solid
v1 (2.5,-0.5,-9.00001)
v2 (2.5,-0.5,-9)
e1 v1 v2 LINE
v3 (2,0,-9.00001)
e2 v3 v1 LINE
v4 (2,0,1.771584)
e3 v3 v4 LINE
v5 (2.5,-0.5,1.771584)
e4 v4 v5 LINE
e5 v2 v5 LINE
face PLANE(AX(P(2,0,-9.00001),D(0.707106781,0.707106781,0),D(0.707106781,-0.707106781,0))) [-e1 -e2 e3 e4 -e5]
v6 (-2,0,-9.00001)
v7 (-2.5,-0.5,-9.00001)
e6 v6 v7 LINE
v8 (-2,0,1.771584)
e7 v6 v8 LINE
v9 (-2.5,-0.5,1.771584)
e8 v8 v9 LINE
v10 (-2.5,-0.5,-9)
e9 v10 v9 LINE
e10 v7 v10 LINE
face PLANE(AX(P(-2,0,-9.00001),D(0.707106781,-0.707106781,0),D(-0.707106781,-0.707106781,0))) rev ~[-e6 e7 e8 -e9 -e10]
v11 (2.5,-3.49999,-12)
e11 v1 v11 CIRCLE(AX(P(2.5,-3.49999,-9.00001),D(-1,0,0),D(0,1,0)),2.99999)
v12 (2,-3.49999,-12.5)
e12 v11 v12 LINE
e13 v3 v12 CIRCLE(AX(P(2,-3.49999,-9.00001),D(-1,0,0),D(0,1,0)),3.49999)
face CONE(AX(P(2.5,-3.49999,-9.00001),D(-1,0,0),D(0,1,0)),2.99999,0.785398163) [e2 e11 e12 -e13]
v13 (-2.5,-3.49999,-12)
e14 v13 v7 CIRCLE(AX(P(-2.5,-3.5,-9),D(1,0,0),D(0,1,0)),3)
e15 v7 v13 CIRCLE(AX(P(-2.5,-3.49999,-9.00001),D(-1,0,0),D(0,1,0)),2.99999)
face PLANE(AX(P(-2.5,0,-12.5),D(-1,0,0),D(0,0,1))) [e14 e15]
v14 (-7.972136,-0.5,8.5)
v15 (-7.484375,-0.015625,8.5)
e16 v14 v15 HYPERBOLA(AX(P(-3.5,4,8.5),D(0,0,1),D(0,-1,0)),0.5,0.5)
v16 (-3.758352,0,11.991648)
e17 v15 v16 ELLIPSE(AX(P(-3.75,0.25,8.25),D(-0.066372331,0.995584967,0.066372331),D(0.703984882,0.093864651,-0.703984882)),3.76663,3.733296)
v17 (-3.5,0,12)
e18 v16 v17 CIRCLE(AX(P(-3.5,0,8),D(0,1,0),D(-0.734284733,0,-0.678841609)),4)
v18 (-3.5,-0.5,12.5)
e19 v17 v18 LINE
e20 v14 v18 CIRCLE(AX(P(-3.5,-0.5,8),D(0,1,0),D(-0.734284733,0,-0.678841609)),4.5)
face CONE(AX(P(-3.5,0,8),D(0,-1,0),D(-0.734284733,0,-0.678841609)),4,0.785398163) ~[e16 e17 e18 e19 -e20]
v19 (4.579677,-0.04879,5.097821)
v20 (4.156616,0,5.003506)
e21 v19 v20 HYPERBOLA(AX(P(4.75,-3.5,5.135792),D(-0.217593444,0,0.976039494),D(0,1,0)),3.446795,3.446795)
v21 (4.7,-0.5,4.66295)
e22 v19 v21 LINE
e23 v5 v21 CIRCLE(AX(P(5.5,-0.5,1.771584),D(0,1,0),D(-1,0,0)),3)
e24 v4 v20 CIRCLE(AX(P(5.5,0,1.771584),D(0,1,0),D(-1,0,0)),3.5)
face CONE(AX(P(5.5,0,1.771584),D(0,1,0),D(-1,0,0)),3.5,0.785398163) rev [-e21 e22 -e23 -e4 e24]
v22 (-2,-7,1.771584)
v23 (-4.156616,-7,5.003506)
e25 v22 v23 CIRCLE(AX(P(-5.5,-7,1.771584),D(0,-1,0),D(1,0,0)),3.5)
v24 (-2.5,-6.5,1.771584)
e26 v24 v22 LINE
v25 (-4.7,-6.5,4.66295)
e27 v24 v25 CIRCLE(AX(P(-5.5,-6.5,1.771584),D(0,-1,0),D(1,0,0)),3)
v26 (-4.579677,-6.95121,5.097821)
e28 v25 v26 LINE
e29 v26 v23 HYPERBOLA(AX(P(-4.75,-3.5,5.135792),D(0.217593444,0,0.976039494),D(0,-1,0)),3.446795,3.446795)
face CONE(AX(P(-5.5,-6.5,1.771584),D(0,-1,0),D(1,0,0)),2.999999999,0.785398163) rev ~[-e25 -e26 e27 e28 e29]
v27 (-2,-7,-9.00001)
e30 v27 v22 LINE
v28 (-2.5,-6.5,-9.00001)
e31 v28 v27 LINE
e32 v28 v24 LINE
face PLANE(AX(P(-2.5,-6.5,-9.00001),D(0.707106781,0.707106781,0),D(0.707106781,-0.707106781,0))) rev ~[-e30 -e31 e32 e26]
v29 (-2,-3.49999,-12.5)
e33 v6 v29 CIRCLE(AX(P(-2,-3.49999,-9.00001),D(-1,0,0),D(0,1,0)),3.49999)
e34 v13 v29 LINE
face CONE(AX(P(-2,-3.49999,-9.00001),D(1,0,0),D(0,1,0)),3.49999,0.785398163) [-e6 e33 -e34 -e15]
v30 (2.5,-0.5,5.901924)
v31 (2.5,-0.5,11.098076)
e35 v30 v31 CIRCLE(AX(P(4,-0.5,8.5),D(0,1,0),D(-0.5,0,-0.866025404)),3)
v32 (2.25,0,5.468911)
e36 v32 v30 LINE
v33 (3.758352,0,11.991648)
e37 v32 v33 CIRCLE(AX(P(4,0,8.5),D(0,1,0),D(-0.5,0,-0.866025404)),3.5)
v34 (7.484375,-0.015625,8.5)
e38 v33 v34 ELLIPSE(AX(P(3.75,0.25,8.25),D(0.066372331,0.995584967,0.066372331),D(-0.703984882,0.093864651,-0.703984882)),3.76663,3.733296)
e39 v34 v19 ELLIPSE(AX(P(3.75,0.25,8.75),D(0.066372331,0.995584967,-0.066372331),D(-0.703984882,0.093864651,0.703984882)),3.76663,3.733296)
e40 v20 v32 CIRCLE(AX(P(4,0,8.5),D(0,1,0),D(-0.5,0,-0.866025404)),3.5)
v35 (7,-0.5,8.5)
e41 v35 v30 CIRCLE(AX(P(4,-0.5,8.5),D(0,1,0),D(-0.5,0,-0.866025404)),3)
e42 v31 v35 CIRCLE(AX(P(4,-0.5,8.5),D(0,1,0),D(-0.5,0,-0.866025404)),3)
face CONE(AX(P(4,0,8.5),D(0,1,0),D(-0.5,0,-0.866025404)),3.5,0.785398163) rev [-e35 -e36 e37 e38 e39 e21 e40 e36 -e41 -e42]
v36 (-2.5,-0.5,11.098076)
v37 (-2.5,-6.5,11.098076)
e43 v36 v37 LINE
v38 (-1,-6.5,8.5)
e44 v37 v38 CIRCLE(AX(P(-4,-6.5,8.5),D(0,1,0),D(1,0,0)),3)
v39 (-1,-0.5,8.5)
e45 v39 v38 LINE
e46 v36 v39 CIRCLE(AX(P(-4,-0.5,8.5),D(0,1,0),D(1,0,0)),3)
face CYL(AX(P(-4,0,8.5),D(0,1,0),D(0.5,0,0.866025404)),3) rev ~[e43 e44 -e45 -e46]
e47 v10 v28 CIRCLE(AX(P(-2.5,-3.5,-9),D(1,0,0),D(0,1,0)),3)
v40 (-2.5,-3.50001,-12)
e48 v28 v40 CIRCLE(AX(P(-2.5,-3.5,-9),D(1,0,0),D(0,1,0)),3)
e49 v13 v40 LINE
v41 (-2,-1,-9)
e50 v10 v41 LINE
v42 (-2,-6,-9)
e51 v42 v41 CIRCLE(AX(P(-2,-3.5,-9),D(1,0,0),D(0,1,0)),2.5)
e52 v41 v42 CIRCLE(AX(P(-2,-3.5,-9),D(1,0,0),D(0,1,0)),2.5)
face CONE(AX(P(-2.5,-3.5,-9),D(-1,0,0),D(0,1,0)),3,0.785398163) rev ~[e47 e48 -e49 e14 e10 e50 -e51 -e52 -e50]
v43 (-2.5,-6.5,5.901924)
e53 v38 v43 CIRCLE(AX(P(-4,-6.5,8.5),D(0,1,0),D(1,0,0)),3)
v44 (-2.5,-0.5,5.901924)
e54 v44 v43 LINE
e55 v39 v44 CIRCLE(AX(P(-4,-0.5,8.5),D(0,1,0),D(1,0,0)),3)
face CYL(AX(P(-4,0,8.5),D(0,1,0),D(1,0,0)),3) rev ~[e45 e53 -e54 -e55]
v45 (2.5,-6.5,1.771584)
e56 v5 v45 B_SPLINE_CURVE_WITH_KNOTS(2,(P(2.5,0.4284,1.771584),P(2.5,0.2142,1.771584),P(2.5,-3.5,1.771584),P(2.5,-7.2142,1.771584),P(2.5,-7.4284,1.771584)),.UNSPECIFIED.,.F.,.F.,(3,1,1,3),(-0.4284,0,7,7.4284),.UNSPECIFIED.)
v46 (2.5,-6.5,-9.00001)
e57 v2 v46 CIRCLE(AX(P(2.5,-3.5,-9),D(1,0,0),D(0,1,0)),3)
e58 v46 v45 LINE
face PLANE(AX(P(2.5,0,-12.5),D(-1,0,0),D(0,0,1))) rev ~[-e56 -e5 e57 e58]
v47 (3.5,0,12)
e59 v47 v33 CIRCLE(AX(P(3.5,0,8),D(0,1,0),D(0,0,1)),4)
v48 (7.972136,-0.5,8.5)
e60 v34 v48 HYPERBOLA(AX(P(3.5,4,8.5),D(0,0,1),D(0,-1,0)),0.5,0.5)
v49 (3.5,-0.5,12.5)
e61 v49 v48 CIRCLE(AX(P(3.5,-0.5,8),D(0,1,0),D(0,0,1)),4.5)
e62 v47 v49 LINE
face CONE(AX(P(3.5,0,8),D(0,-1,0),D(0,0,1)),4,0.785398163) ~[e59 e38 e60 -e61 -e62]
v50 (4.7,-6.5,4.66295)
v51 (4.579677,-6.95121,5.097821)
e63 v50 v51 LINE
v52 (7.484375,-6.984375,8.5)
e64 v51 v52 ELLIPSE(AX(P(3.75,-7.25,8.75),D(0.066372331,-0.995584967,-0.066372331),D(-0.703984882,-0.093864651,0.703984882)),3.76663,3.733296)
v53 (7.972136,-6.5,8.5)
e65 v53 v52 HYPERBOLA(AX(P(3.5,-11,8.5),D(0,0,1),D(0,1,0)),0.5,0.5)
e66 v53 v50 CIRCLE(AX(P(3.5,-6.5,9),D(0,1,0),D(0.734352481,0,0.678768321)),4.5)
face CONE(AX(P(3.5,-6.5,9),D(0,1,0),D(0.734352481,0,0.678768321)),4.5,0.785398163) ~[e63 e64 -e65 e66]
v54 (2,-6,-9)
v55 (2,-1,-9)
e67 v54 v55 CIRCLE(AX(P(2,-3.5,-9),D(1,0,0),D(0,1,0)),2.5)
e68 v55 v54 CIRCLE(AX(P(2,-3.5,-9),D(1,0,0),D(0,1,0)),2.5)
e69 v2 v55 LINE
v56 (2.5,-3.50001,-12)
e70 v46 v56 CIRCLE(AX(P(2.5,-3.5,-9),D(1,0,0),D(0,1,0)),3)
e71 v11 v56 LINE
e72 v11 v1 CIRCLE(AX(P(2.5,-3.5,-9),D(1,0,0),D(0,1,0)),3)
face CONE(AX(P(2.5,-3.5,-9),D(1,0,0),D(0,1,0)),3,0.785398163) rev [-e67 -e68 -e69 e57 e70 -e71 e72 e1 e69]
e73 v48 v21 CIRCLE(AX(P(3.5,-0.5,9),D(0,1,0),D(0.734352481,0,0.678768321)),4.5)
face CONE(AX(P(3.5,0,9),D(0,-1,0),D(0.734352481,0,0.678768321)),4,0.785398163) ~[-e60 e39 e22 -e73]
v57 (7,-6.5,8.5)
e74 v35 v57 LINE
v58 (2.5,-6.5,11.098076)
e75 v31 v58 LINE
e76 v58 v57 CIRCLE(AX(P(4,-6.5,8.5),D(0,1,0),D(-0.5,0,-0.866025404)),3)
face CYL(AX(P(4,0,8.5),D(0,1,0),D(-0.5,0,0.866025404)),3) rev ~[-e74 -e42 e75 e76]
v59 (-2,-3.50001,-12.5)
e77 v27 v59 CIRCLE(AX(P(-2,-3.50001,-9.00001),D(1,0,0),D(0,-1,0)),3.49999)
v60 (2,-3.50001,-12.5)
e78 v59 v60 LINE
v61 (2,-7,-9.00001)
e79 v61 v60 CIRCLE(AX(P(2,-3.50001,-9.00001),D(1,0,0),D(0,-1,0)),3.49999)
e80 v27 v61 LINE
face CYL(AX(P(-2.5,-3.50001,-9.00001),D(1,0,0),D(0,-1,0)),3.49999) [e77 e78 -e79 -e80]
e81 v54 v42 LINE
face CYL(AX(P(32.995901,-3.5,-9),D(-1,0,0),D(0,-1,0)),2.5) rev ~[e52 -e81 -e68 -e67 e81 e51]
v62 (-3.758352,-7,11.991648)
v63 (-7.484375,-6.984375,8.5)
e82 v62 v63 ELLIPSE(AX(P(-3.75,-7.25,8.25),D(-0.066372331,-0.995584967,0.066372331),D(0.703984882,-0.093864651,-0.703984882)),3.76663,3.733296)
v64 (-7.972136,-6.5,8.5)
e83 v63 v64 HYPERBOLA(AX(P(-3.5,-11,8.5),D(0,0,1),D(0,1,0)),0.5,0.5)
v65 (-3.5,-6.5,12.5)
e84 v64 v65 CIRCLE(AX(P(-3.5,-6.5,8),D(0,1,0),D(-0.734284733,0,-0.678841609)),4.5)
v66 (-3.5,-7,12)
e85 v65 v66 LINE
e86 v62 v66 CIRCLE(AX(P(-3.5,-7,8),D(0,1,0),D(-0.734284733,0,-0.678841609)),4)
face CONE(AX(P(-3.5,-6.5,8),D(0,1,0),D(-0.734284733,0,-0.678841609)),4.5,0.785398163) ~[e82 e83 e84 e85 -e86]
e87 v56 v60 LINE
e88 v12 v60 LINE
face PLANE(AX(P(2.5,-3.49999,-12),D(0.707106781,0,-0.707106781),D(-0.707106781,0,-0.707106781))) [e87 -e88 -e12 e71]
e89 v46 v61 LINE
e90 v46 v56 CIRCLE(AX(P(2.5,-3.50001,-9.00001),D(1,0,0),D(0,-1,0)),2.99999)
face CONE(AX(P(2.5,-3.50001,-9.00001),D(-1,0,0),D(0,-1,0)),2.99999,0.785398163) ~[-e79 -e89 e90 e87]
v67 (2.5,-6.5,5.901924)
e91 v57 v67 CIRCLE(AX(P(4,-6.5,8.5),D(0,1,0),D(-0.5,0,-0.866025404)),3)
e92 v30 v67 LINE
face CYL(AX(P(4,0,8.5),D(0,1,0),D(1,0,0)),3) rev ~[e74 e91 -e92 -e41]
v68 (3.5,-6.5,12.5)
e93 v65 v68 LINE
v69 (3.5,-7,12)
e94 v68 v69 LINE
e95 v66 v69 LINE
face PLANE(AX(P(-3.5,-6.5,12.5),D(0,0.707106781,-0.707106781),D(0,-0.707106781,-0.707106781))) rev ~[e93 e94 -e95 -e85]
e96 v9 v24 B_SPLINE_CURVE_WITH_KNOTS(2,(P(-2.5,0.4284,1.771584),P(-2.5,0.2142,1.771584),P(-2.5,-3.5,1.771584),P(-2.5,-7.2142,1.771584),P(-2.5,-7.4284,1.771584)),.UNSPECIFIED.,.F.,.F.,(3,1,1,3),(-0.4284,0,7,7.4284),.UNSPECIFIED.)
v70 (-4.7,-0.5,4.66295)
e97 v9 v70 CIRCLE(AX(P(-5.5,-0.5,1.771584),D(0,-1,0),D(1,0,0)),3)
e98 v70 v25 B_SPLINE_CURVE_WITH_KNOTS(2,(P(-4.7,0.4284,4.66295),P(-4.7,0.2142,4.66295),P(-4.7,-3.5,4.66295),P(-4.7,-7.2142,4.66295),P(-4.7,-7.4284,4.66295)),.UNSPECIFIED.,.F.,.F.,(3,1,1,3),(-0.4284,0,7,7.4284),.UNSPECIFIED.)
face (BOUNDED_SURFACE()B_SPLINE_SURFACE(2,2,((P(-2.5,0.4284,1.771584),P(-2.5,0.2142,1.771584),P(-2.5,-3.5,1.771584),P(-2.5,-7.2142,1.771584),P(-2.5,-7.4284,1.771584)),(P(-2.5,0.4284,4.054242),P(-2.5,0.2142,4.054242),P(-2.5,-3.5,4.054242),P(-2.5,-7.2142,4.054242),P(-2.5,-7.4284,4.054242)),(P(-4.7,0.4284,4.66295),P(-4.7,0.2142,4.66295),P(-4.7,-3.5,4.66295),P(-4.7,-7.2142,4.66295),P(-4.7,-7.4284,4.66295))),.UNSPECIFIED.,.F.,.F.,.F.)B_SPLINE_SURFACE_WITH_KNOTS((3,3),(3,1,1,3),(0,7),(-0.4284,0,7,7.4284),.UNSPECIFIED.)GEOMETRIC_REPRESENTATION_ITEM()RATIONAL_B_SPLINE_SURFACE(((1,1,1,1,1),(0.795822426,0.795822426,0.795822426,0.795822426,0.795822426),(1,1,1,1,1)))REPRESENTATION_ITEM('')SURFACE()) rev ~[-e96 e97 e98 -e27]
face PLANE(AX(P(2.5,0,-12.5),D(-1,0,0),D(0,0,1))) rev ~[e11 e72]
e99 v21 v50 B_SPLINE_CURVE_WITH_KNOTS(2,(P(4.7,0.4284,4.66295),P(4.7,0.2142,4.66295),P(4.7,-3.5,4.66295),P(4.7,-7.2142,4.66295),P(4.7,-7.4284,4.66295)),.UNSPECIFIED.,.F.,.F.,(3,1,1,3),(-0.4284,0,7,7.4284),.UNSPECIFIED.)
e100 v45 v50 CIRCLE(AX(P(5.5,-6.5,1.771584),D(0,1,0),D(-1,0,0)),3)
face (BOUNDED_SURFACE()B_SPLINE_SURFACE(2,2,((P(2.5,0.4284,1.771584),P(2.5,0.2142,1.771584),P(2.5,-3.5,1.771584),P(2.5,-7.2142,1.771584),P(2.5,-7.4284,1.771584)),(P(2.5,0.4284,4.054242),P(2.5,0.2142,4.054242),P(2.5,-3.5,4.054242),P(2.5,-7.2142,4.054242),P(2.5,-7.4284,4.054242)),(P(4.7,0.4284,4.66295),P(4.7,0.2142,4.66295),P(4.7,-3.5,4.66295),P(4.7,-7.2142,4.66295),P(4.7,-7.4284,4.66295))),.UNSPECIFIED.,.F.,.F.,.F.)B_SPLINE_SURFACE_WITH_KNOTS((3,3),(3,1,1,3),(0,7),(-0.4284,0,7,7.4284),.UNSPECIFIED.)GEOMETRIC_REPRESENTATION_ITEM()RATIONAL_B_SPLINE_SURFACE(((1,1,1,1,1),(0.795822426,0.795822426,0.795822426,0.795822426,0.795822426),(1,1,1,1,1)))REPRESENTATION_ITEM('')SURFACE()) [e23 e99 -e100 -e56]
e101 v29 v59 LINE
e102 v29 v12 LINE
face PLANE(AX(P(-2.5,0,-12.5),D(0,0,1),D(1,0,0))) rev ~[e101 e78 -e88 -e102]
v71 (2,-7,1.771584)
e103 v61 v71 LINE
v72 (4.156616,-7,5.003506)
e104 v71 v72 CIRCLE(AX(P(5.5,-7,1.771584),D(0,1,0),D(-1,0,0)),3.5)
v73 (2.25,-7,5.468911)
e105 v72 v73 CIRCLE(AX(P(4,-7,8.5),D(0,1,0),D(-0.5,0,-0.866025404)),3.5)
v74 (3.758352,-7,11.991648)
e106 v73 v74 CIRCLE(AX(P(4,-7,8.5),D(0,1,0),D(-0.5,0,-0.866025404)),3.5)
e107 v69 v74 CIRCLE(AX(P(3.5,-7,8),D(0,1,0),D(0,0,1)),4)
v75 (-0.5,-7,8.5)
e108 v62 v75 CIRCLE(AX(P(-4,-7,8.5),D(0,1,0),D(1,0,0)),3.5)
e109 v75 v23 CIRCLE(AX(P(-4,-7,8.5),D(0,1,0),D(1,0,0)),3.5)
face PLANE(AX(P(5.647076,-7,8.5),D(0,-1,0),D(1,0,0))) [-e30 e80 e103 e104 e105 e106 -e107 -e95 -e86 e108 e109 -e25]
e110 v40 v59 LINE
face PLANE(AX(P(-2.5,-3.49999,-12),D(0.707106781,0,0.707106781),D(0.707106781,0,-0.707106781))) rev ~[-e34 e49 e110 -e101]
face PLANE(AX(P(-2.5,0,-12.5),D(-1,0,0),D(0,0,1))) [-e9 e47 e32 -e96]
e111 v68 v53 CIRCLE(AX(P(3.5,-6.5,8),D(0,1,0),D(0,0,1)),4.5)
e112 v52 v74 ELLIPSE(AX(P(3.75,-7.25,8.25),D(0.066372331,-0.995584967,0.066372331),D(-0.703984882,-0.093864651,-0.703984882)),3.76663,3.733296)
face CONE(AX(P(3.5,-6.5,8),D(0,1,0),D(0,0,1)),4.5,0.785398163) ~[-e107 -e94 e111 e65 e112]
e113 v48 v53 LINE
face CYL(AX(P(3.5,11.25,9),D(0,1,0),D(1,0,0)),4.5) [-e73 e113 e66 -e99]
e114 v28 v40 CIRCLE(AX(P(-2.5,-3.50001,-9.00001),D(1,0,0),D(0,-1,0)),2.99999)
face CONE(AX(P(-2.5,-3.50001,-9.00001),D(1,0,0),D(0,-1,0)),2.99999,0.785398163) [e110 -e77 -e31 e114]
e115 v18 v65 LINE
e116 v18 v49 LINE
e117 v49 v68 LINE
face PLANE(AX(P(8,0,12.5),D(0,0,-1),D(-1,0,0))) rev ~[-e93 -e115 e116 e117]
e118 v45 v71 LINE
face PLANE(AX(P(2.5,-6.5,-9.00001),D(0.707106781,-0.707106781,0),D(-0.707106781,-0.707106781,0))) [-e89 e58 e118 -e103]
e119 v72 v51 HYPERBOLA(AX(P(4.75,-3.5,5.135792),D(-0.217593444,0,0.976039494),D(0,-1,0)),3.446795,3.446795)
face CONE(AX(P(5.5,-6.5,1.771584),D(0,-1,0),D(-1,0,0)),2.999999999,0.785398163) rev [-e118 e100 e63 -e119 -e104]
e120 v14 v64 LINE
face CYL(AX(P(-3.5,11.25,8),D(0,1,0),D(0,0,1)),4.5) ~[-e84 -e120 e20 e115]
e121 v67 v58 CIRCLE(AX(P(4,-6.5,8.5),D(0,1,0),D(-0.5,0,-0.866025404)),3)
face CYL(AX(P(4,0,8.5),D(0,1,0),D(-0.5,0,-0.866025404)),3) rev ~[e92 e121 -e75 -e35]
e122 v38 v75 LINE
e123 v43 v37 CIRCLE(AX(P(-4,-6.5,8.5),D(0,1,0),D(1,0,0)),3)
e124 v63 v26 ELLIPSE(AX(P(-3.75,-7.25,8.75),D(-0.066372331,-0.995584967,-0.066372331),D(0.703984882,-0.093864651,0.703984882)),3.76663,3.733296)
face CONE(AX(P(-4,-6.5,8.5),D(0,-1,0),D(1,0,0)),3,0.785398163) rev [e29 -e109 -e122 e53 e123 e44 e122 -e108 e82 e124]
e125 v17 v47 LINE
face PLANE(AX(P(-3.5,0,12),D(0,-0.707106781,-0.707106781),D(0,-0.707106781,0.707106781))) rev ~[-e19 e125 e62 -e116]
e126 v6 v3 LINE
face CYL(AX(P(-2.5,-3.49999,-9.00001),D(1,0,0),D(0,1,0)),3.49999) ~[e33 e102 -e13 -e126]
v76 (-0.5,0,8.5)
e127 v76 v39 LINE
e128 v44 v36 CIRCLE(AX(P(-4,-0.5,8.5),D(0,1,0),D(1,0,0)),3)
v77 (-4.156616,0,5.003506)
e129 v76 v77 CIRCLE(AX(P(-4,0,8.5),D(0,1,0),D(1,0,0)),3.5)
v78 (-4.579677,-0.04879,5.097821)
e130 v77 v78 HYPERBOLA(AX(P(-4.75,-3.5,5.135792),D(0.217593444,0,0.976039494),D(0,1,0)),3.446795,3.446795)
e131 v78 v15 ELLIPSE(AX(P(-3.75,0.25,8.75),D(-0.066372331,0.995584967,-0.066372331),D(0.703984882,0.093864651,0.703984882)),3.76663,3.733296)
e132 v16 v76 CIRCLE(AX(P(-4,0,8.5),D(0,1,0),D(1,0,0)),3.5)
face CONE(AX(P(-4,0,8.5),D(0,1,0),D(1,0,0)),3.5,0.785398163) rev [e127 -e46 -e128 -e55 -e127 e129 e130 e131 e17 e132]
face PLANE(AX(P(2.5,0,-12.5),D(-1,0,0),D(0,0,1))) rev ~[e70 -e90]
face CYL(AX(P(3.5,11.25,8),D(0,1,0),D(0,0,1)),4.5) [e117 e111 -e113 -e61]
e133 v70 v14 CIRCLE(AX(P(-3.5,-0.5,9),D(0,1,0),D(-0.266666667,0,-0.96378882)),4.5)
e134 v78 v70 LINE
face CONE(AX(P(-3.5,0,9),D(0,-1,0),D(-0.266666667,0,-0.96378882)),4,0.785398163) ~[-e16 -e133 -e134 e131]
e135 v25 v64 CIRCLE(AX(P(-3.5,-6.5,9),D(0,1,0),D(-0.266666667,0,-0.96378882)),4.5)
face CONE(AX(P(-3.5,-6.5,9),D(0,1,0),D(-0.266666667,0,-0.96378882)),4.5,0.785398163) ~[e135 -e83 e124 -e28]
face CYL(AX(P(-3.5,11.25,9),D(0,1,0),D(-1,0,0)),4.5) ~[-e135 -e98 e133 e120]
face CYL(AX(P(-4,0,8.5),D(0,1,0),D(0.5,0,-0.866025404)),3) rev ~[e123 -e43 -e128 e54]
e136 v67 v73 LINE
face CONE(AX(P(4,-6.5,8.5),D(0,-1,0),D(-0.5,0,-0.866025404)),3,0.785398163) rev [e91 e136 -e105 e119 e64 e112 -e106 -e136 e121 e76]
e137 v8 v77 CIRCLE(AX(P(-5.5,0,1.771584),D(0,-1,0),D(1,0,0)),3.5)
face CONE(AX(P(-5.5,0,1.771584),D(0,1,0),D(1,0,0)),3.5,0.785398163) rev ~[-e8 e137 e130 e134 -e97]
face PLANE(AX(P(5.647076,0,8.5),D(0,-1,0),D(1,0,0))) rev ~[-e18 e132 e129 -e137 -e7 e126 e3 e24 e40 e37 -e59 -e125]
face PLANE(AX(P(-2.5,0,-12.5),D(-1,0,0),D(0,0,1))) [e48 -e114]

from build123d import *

# Parameters (mm, degrees)
F0_W         = 5
F0_H         = 17
F1_DEPTH     = 7
F3_D         = 5
F4_T1_DEPTH  = 29.5
F5_R         = 3.49999
F6_R         = 3
F7_T1_DEPTH  = 10.7715938526
F7_T3_DEPTH  = 7
F7_T5_DEPTH  = 2e-05
F7_T16_ANGLE = 74.5339900582
F7_T18_ANGLE = 117.281460121
F7_T20_ANGLE = 132.7531885059
F7_T22_ANGLE = 74.5339900582
F7_T24_ANGLE = 117.281460121
F7_T26_ANGLE = 132.7531885059
F7_T28_ANGLE = 90
F7_T30_ANGLE = 90
F7_T34_ANGLE = 74.5339900582
F7_T36_ANGLE = 90
F7_T38_ANGLE = 117.281460121
F7_T40_ANGLE = 90
F7_T44_ANGLE = 132.7531885059
F7_T46_ANGLE = 74.5339900582
F7_T48_ANGLE = 117.281460121
F7_T50_ANGLE = 132.7531885059


# Not quite as in the source:
# - a fillet or chamfer that OpenCascade refuses, or shapes differently, is made with other operations: its cross-section is extruded or revolved along the edge and cut away or added
# - two fillets or chamfers of one size are made in one step
# - a fillet or chamfer is up to 0.001 mm smaller than in the source, because OpenCascade refuses the exact size


with BuildPart() as f1:
    # F0 (on Front) → F1 (new body)
    with BuildSketch(Plane.XZ):
        with BuildLine():
            Line((8, 12.5), (2.5, 12.5))
            Line((2.5, 12.5), (2.5, 11.0980762114))
            ThreePointArc((2.5, 11.0980762114), (5.5, 11.0980762114), (7, 8.5))
            ThreePointArc((7, 8.5), (5.5, 5.9019237886), (2.5, 5.9019237886))
            Line((2.5, 5.9019237886), (2.5, 4.5))
            Line((2.5, 4.5), (8, 4.5))
            Line((8, 4.5), (8, 12.5))
        make_face()
        with BuildLine():
            Line((-2.5, 11.0980762114), (-2.5, 12.5))
            Line((-2.5, 12.5), (-8, 12.5))
            Line((-8, 12.5), (-8, 4.5))
            Line((-8, 4.5), (-2.5, 4.5))
            Line((-2.5, 4.5), (-2.5, 5.9019237886))
            ThreePointArc((-2.5, 5.9019237886), (-7, 8.5), (-2.5, 11.0980762114))
        make_face()
        with BuildLine():
            Line((2.5, 11.0980762114), (2.5, 12.5))
            Line((2.5, 12.5), (-2.5, 12.5))
            Line((-2.5, 12.5), (-2.5, 11.0980762114))
            ThreePointArc((-2.5, 11.0980762114), (-1.4019237886, 10), (-1, 8.5))
            ThreePointArc((-1, 8.5), (-1.4019237886, 7), (-2.5, 5.9019237886))
            Line((-2.5, 5.9019237886), (-2.5, 4.5))
            Line((-2.5, 4.5), (2.5, 4.5))
            Line((2.5, 4.5), (2.5, 5.9019237886))
            ThreePointArc((2.5, 5.9019237886), (1, 8.5), (2.5, 11.0980762114))
        make_face()
        with Locations((0, -4)):
            Rectangle(F0_W, F0_H)
    extrude(amount=F1_DEPTH)

    # F3 (through all)
    with Locations(Plane.YZ.offset(2.5)):
        with Locations((-3.5, -9)):
            Hole(F3_D / 2)

    # F4: fillet of radius 4.5 on 4 edges, made by hand

    # F4_s2 → F4_t1 (cut)
    with BuildSketch(Plane.XZ.offset(-11.25)):
        with BuildLine():
            ThreePointArc((3.5, 12.5), (6.6819805153, 11.1819805153), (8, 8))
            Line((8, 8), (8, 12.5))
            Line((8, 12.5), (3.5, 12.5))
        make_face()
        with BuildLine():
            ThreePointArc((-3.5, 12.5), (-6.6819805153, 11.1819805153), (-8, 8))
            Line((-8, 8), (-8, 12.5))
            Line((-8, 12.5), (-3.5, 12.5))
        make_face()
        with BuildLine():
            ThreePointArc((8, 9), (6.6819805153, 5.8180194847), (3.5, 4.5))
            Line((3.5, 4.5), (8, 4.5))
            Line((8, 4.5), (8, 9))
        make_face()
        with BuildLine():
            ThreePointArc((-8, 9), (-6.6819805153, 5.8180194847), (-3.5, 4.5))
            Line((-3.5, 4.5), (-8, 4.5))
            Line((-8, 4.5), (-8, 9))
        make_face()
    extrude(amount=F4_T1_DEPTH, mode=Mode.SUBTRACT)

    # F5 (radius 3.5 in the source; OpenCascade refuses exactly that, so slightly less here)
    f5_edges = [f1.edges().sort_by_distance(p)[0] for p in [
        (0, 0, -12.5),
        (0, -7, -12.5),
    ]]
    fillet(f5_edges, radius=F5_R)

    # F6
    f6_edges = [f1.edges().sort_by_distance(p)[0] for p in [
        (2.5, -3.5, 4.5),
        (-2.5, -3.5, 4.5),
    ]]
    fillet(f6_edges, radius=F6_R)

    # F7: chamfer of 0.5 on 30 edges, made by hand

    # F7_s2 → F7_t1 (cut)
    with BuildSketch(Plane.XY.offset(-9.00001)):
        Polygon((2, 0), (2.5, -0.5), (2.5, 0), align=None)
        Polygon((-2, 0), (-2.5, -0.5), (-2.5, 0), align=None)
        Polygon((2.5, -6.5), (2, -7), (2.5, -7), align=None)
        Polygon((-2.5, -6.5), (-2, -7), (-2.5, -7), align=None)
    extrude(amount=F7_T1_DEPTH, mode=Mode.SUBTRACT)

    # F7_s4 → F7_t3 (cut)
    with BuildSketch(Plane.YZ.offset(-3.5)):
        Polygon((0, 12), (-0.5, 12.5), (0, 12.5), align=None)
        Polygon((-6.5, 12.5), (-7, 12), (-7, 12.5), align=None)
    extrude(amount=F7_T3_DEPTH, mode=Mode.SUBTRACT)

    # F7_s6 → F7_t5 (cut)
    with BuildSketch(Plane.XZ.offset(3.49999)):
        Polygon((2.5, -12), (2, -12.5), (2.5, -12.5), align=None)
        Polygon((-2.5, -12), (-2, -12.5), (-2.5, -12.5), align=None)
    extrude(amount=F7_T5_DEPTH, mode=Mode.SUBTRACT)

    # F7_s7 → F7_t8 (revolve, cut)
    with BuildSketch(Plane.XY.offset(8.5)):
        Polygon((-1, -6.5), (-0.5, -7), (-1, -7), align=None)
    revolve(axis=Axis((-4, -7, 8.5), (0, 1, 0)), mode=Mode.SUBTRACT)

    # F7_s9 → F7_t10 (revolve, cut)
    with BuildSketch(Plane(origin=(-0.6806079661, 0, 0.3929491924), x_dir=(0, 1, 0), z_dir=(0.8660254038, 0, -0.5))):
        Polygon((-6.5, 6.3612159322), (-7, 5.8612159322), (-7, 6.3612159322), align=None)
    revolve(axis=Axis((4, -7, 8.5), (0, 1, 0)), mode=Mode.SUBTRACT)

    # F7_s11 → F7_t12 (revolve, cut)
    with BuildSketch(Plane.XY.offset(8.5)):
        Polygon((-0.5, 0), (-1, -0.5), (-1, 0), align=None)
    revolve(axis=Axis((-4, 0, 8.5), (0, 1, 0)), mode=Mode.SUBTRACT)

    # F7_s13 → F7_t14 (revolve, cut)
    with BuildSketch(Plane(origin=(-0.6806079661, 0, 0.3929491924), x_dir=(0, 1, 0), z_dir=(0.8660254038, 0, -0.5))):
        Polygon((0, 5.8612159322), (-0.5, 6.3612159322), (0, 6.3612159322), align=None)
    revolve(axis=Axis((4, 0, 8.5), (0, 1, 0)), mode=Mode.SUBTRACT)

    # F7_s15 → F7_t16 (revolve, cut)
    with BuildSketch(Plane.XY.offset(1.771583853)):
        Polygon((2, 0), (2.5000000001, -0.5), (2.5, 0), align=None)
    revolve(axis=Axis((5.4999999996, 0, 1.771583853), (0, 1, 0)), revolution_arc=F7_T16_ANGLE, mode=Mode.SUBTRACT)

    # F7_s17 → F7_t18 (revolve, cut)
    with BuildSketch(Plane(origin=(-2.8735542897, 0, 3.1088689023), x_dir=(0, 1, 0), z_dir=(-0.6787683205, 0, 0.7343524815))):
        Polygon((0, -12.6791485698), (-0.5, -13.1791485698), (0, -13.1791485698), align=None)
    revolve(axis=Axis((3.4999999999, 0, 9.0000000001), (0, 1, 0)), revolution_arc=F7_T18_ANGLE, mode=Mode.SUBTRACT)

    # F7_s19 → F7_t20 (revolve, cut)
    with BuildSketch(Plane.YZ.offset(3.4999999999)):
        Polygon((0, 12), (-0.5, 12.5), (0, 12.5), align=None)
    revolve(axis=Axis((3.4999999999, 0, 7.9999999999), (0, 1, 0)), revolution_arc=F7_T20_ANGLE, mode=Mode.SUBTRACT)

    # F7_s21 → F7_t22 (revolve, cut)
    with BuildSketch(Plane.XY.offset(1.771583853)):
        Polygon((-2, 0), (-2.5000000001, -0.5), (-2.5, 0), align=None)
    revolve(axis=Axis((-5.4999999996, 0, 1.771583853), (0, -1, 0)), revolution_arc=F7_T22_ANGLE, mode=Mode.SUBTRACT)

    # F7_s23 → F7_t24 (revolve, cut)
    with BuildSketch(Plane(origin=(-5.5642042783, 0, 1.5395362318), x_dir=(0, 1, 0), z_dir=(0.9637888196, 0, -0.2666666667))):
        Polygon((0, 3.7407660435), (-0.5, 3.2407660435), (0, 3.2407660435), align=None)
    revolve(axis=Axis((-3.4999999999, 0, 9.0000000001), (0, 1, 0)), revolution_arc=F7_T24_ANGLE, mode=Mode.SUBTRACT)

    # F7_s25 → F7_t26 (revolve, cut)
    with BuildSketch(Plane(origin=(-5.6005949978, 0, 6.0580131587), x_dir=(0, 1, 0), z_dir=(0.6788416095, 0, -0.7342847331))):
        Polygon((0, -1.1392636899), (-0.5, -1.6392636899), (0, -1.6392636899), align=None)
    revolve(axis=Axis((-3.4999999999, 0, 7.9999999999), (0, 1, 0)), revolution_arc=F7_T26_ANGLE, mode=Mode.SUBTRACT)

    # F7_s27 → F7_t28 (revolve, cut)
    with BuildSketch(Plane.XY.offset(-9.00001)):
        Polygon((2.5, -0.5), (2, 0), (2.5, 0), align=None)
    revolve(axis=Axis((2.5, -3.49999, -9.00001), (-1, 0, 0)), revolution_arc=F7_T28_ANGLE, mode=Mode.SUBTRACT)

    # F7_s29 → F7_t30 (revolve, cut)
    with BuildSketch(Plane.XY.offset(-9.00001)):
        Polygon((2.5, -6.5), (2, -7), (2.5, -7), align=None)
    revolve(axis=Axis((2.5, -3.50001, -9.00001), (1, 0, 0)), revolution_arc=F7_T30_ANGLE, mode=Mode.SUBTRACT)

    # F7_s31 → F7_t32 (revolve, cut)
    with BuildSketch(Plane.XY.offset(-9)):
        Polygon((2.5, -0.5), (2, -1), (2.5, -1), align=None)
    revolve(axis=Axis((2.5, -3.5, -9), (1, 0, 0)), mode=Mode.SUBTRACT)

    # F7_s33 → F7_t34 (revolve, cut)
    with BuildSketch(Plane.XY.offset(1.771583853)):
        Polygon((2.5000000001, -6.5), (2, -7), (2.5, -7), align=None)
    revolve(axis=Axis((5.4999999996, -7, 1.771583853), (0, 1, 0)), revolution_arc=F7_T34_ANGLE, mode=Mode.SUBTRACT)

    # F7_s35 → F7_t36 (revolve, cut)
    with BuildSketch(Plane.XY.offset(-9.00001)):
        Polygon((-2, 0), (-2.5, -0.5), (-2.5, 0), align=None)
    revolve(axis=Axis((-2.5, -3.49999, -9.00001), (-1, 0, 0)), revolution_arc=F7_T36_ANGLE, mode=Mode.SUBTRACT)

    # F7_s37 → F7_t38 (revolve, cut)
    with BuildSketch(Plane(origin=(-2.8735542897, 0, 3.1088689023), x_dir=(0, 1, 0), z_dir=(-0.6787683205, 0, 0.7343524815))):
        Polygon((-6.5, -13.1791485698), (-7, -12.6791485698), (-7, -13.1791485698), align=None)
    revolve(axis=Axis((3.4999999999, -7, 9.0000000001), (0, 1, 0)), revolution_arc=F7_T38_ANGLE, mode=Mode.SUBTRACT)

    # F7_s39 → F7_t40 (revolve, cut)
    with BuildSketch(Plane.XY.offset(-9.00001)):
        Polygon((-2.5, -6.5), (-2, -7), (-2.5, -7), align=None)
    revolve(axis=Axis((-2.5, -3.50001, -9.00001), (1, 0, 0)), revolution_arc=F7_T40_ANGLE, mode=Mode.SUBTRACT)

    # F7_s41 → F7_t42 (revolve, cut)
    with BuildSketch(Plane.XY.offset(-9)):
        Polygon((-2.5, -0.5), (-2, -1), (-2.5, -1), align=None)
    revolve(axis=Axis((-2.5, -3.5, -9), (1, 0, 0)), mode=Mode.SUBTRACT)

    # F7_s43 → F7_t44 (revolve, cut)
    with BuildSketch(Plane.YZ.offset(3.4999999999)):
        Polygon((-6.5, 12.5), (-7, 12), (-7, 12.5), align=None)
    revolve(axis=Axis((3.4999999999, -7, 7.9999999999), (0, 1, 0)), revolution_arc=F7_T44_ANGLE, mode=Mode.SUBTRACT)

    # F7_s45 → F7_t46 (revolve, cut)
    with BuildSketch(Plane.XY.offset(1.771583853)):
        Polygon((-2.5000000001, -6.5), (-2, -7), (-2.5, -7), align=None)
    revolve(axis=Axis((-5.4999999996, -7, 1.771583853), (0, -1, 0)), revolution_arc=F7_T46_ANGLE, mode=Mode.SUBTRACT)

    # F7_s47 → F7_t48 (revolve, cut)
    with BuildSketch(Plane(origin=(-5.5642042783, 0, 1.5395362318), x_dir=(0, 1, 0), z_dir=(0.9637888196, 0, -0.2666666667))):
        Polygon((-6.5, 3.2407660435), (-7, 3.7407660435), (-7, 3.2407660435), align=None)
    revolve(axis=Axis((-3.4999999999, -7, 9.0000000001), (0, 1, 0)), revolution_arc=F7_T48_ANGLE, mode=Mode.SUBTRACT)

    # F7_s49 → F7_t50 (revolve, cut)
    with BuildSketch(Plane(origin=(-5.6005949978, 0, 6.0580131587), x_dir=(0, 1, 0), z_dir=(0.6788416095, 0, -0.7342847331))):
        Polygon((-6.5, -1.6392636899), (-7, -1.1392636899), (-7, -1.6392636899), align=None)
    revolve(axis=Axis((-3.4999999999, -7, 7.9999999999), (0, 1, 0)), revolution_arc=F7_T50_ANGLE, mode=Mode.SUBTRACT)


solid = f1.part
